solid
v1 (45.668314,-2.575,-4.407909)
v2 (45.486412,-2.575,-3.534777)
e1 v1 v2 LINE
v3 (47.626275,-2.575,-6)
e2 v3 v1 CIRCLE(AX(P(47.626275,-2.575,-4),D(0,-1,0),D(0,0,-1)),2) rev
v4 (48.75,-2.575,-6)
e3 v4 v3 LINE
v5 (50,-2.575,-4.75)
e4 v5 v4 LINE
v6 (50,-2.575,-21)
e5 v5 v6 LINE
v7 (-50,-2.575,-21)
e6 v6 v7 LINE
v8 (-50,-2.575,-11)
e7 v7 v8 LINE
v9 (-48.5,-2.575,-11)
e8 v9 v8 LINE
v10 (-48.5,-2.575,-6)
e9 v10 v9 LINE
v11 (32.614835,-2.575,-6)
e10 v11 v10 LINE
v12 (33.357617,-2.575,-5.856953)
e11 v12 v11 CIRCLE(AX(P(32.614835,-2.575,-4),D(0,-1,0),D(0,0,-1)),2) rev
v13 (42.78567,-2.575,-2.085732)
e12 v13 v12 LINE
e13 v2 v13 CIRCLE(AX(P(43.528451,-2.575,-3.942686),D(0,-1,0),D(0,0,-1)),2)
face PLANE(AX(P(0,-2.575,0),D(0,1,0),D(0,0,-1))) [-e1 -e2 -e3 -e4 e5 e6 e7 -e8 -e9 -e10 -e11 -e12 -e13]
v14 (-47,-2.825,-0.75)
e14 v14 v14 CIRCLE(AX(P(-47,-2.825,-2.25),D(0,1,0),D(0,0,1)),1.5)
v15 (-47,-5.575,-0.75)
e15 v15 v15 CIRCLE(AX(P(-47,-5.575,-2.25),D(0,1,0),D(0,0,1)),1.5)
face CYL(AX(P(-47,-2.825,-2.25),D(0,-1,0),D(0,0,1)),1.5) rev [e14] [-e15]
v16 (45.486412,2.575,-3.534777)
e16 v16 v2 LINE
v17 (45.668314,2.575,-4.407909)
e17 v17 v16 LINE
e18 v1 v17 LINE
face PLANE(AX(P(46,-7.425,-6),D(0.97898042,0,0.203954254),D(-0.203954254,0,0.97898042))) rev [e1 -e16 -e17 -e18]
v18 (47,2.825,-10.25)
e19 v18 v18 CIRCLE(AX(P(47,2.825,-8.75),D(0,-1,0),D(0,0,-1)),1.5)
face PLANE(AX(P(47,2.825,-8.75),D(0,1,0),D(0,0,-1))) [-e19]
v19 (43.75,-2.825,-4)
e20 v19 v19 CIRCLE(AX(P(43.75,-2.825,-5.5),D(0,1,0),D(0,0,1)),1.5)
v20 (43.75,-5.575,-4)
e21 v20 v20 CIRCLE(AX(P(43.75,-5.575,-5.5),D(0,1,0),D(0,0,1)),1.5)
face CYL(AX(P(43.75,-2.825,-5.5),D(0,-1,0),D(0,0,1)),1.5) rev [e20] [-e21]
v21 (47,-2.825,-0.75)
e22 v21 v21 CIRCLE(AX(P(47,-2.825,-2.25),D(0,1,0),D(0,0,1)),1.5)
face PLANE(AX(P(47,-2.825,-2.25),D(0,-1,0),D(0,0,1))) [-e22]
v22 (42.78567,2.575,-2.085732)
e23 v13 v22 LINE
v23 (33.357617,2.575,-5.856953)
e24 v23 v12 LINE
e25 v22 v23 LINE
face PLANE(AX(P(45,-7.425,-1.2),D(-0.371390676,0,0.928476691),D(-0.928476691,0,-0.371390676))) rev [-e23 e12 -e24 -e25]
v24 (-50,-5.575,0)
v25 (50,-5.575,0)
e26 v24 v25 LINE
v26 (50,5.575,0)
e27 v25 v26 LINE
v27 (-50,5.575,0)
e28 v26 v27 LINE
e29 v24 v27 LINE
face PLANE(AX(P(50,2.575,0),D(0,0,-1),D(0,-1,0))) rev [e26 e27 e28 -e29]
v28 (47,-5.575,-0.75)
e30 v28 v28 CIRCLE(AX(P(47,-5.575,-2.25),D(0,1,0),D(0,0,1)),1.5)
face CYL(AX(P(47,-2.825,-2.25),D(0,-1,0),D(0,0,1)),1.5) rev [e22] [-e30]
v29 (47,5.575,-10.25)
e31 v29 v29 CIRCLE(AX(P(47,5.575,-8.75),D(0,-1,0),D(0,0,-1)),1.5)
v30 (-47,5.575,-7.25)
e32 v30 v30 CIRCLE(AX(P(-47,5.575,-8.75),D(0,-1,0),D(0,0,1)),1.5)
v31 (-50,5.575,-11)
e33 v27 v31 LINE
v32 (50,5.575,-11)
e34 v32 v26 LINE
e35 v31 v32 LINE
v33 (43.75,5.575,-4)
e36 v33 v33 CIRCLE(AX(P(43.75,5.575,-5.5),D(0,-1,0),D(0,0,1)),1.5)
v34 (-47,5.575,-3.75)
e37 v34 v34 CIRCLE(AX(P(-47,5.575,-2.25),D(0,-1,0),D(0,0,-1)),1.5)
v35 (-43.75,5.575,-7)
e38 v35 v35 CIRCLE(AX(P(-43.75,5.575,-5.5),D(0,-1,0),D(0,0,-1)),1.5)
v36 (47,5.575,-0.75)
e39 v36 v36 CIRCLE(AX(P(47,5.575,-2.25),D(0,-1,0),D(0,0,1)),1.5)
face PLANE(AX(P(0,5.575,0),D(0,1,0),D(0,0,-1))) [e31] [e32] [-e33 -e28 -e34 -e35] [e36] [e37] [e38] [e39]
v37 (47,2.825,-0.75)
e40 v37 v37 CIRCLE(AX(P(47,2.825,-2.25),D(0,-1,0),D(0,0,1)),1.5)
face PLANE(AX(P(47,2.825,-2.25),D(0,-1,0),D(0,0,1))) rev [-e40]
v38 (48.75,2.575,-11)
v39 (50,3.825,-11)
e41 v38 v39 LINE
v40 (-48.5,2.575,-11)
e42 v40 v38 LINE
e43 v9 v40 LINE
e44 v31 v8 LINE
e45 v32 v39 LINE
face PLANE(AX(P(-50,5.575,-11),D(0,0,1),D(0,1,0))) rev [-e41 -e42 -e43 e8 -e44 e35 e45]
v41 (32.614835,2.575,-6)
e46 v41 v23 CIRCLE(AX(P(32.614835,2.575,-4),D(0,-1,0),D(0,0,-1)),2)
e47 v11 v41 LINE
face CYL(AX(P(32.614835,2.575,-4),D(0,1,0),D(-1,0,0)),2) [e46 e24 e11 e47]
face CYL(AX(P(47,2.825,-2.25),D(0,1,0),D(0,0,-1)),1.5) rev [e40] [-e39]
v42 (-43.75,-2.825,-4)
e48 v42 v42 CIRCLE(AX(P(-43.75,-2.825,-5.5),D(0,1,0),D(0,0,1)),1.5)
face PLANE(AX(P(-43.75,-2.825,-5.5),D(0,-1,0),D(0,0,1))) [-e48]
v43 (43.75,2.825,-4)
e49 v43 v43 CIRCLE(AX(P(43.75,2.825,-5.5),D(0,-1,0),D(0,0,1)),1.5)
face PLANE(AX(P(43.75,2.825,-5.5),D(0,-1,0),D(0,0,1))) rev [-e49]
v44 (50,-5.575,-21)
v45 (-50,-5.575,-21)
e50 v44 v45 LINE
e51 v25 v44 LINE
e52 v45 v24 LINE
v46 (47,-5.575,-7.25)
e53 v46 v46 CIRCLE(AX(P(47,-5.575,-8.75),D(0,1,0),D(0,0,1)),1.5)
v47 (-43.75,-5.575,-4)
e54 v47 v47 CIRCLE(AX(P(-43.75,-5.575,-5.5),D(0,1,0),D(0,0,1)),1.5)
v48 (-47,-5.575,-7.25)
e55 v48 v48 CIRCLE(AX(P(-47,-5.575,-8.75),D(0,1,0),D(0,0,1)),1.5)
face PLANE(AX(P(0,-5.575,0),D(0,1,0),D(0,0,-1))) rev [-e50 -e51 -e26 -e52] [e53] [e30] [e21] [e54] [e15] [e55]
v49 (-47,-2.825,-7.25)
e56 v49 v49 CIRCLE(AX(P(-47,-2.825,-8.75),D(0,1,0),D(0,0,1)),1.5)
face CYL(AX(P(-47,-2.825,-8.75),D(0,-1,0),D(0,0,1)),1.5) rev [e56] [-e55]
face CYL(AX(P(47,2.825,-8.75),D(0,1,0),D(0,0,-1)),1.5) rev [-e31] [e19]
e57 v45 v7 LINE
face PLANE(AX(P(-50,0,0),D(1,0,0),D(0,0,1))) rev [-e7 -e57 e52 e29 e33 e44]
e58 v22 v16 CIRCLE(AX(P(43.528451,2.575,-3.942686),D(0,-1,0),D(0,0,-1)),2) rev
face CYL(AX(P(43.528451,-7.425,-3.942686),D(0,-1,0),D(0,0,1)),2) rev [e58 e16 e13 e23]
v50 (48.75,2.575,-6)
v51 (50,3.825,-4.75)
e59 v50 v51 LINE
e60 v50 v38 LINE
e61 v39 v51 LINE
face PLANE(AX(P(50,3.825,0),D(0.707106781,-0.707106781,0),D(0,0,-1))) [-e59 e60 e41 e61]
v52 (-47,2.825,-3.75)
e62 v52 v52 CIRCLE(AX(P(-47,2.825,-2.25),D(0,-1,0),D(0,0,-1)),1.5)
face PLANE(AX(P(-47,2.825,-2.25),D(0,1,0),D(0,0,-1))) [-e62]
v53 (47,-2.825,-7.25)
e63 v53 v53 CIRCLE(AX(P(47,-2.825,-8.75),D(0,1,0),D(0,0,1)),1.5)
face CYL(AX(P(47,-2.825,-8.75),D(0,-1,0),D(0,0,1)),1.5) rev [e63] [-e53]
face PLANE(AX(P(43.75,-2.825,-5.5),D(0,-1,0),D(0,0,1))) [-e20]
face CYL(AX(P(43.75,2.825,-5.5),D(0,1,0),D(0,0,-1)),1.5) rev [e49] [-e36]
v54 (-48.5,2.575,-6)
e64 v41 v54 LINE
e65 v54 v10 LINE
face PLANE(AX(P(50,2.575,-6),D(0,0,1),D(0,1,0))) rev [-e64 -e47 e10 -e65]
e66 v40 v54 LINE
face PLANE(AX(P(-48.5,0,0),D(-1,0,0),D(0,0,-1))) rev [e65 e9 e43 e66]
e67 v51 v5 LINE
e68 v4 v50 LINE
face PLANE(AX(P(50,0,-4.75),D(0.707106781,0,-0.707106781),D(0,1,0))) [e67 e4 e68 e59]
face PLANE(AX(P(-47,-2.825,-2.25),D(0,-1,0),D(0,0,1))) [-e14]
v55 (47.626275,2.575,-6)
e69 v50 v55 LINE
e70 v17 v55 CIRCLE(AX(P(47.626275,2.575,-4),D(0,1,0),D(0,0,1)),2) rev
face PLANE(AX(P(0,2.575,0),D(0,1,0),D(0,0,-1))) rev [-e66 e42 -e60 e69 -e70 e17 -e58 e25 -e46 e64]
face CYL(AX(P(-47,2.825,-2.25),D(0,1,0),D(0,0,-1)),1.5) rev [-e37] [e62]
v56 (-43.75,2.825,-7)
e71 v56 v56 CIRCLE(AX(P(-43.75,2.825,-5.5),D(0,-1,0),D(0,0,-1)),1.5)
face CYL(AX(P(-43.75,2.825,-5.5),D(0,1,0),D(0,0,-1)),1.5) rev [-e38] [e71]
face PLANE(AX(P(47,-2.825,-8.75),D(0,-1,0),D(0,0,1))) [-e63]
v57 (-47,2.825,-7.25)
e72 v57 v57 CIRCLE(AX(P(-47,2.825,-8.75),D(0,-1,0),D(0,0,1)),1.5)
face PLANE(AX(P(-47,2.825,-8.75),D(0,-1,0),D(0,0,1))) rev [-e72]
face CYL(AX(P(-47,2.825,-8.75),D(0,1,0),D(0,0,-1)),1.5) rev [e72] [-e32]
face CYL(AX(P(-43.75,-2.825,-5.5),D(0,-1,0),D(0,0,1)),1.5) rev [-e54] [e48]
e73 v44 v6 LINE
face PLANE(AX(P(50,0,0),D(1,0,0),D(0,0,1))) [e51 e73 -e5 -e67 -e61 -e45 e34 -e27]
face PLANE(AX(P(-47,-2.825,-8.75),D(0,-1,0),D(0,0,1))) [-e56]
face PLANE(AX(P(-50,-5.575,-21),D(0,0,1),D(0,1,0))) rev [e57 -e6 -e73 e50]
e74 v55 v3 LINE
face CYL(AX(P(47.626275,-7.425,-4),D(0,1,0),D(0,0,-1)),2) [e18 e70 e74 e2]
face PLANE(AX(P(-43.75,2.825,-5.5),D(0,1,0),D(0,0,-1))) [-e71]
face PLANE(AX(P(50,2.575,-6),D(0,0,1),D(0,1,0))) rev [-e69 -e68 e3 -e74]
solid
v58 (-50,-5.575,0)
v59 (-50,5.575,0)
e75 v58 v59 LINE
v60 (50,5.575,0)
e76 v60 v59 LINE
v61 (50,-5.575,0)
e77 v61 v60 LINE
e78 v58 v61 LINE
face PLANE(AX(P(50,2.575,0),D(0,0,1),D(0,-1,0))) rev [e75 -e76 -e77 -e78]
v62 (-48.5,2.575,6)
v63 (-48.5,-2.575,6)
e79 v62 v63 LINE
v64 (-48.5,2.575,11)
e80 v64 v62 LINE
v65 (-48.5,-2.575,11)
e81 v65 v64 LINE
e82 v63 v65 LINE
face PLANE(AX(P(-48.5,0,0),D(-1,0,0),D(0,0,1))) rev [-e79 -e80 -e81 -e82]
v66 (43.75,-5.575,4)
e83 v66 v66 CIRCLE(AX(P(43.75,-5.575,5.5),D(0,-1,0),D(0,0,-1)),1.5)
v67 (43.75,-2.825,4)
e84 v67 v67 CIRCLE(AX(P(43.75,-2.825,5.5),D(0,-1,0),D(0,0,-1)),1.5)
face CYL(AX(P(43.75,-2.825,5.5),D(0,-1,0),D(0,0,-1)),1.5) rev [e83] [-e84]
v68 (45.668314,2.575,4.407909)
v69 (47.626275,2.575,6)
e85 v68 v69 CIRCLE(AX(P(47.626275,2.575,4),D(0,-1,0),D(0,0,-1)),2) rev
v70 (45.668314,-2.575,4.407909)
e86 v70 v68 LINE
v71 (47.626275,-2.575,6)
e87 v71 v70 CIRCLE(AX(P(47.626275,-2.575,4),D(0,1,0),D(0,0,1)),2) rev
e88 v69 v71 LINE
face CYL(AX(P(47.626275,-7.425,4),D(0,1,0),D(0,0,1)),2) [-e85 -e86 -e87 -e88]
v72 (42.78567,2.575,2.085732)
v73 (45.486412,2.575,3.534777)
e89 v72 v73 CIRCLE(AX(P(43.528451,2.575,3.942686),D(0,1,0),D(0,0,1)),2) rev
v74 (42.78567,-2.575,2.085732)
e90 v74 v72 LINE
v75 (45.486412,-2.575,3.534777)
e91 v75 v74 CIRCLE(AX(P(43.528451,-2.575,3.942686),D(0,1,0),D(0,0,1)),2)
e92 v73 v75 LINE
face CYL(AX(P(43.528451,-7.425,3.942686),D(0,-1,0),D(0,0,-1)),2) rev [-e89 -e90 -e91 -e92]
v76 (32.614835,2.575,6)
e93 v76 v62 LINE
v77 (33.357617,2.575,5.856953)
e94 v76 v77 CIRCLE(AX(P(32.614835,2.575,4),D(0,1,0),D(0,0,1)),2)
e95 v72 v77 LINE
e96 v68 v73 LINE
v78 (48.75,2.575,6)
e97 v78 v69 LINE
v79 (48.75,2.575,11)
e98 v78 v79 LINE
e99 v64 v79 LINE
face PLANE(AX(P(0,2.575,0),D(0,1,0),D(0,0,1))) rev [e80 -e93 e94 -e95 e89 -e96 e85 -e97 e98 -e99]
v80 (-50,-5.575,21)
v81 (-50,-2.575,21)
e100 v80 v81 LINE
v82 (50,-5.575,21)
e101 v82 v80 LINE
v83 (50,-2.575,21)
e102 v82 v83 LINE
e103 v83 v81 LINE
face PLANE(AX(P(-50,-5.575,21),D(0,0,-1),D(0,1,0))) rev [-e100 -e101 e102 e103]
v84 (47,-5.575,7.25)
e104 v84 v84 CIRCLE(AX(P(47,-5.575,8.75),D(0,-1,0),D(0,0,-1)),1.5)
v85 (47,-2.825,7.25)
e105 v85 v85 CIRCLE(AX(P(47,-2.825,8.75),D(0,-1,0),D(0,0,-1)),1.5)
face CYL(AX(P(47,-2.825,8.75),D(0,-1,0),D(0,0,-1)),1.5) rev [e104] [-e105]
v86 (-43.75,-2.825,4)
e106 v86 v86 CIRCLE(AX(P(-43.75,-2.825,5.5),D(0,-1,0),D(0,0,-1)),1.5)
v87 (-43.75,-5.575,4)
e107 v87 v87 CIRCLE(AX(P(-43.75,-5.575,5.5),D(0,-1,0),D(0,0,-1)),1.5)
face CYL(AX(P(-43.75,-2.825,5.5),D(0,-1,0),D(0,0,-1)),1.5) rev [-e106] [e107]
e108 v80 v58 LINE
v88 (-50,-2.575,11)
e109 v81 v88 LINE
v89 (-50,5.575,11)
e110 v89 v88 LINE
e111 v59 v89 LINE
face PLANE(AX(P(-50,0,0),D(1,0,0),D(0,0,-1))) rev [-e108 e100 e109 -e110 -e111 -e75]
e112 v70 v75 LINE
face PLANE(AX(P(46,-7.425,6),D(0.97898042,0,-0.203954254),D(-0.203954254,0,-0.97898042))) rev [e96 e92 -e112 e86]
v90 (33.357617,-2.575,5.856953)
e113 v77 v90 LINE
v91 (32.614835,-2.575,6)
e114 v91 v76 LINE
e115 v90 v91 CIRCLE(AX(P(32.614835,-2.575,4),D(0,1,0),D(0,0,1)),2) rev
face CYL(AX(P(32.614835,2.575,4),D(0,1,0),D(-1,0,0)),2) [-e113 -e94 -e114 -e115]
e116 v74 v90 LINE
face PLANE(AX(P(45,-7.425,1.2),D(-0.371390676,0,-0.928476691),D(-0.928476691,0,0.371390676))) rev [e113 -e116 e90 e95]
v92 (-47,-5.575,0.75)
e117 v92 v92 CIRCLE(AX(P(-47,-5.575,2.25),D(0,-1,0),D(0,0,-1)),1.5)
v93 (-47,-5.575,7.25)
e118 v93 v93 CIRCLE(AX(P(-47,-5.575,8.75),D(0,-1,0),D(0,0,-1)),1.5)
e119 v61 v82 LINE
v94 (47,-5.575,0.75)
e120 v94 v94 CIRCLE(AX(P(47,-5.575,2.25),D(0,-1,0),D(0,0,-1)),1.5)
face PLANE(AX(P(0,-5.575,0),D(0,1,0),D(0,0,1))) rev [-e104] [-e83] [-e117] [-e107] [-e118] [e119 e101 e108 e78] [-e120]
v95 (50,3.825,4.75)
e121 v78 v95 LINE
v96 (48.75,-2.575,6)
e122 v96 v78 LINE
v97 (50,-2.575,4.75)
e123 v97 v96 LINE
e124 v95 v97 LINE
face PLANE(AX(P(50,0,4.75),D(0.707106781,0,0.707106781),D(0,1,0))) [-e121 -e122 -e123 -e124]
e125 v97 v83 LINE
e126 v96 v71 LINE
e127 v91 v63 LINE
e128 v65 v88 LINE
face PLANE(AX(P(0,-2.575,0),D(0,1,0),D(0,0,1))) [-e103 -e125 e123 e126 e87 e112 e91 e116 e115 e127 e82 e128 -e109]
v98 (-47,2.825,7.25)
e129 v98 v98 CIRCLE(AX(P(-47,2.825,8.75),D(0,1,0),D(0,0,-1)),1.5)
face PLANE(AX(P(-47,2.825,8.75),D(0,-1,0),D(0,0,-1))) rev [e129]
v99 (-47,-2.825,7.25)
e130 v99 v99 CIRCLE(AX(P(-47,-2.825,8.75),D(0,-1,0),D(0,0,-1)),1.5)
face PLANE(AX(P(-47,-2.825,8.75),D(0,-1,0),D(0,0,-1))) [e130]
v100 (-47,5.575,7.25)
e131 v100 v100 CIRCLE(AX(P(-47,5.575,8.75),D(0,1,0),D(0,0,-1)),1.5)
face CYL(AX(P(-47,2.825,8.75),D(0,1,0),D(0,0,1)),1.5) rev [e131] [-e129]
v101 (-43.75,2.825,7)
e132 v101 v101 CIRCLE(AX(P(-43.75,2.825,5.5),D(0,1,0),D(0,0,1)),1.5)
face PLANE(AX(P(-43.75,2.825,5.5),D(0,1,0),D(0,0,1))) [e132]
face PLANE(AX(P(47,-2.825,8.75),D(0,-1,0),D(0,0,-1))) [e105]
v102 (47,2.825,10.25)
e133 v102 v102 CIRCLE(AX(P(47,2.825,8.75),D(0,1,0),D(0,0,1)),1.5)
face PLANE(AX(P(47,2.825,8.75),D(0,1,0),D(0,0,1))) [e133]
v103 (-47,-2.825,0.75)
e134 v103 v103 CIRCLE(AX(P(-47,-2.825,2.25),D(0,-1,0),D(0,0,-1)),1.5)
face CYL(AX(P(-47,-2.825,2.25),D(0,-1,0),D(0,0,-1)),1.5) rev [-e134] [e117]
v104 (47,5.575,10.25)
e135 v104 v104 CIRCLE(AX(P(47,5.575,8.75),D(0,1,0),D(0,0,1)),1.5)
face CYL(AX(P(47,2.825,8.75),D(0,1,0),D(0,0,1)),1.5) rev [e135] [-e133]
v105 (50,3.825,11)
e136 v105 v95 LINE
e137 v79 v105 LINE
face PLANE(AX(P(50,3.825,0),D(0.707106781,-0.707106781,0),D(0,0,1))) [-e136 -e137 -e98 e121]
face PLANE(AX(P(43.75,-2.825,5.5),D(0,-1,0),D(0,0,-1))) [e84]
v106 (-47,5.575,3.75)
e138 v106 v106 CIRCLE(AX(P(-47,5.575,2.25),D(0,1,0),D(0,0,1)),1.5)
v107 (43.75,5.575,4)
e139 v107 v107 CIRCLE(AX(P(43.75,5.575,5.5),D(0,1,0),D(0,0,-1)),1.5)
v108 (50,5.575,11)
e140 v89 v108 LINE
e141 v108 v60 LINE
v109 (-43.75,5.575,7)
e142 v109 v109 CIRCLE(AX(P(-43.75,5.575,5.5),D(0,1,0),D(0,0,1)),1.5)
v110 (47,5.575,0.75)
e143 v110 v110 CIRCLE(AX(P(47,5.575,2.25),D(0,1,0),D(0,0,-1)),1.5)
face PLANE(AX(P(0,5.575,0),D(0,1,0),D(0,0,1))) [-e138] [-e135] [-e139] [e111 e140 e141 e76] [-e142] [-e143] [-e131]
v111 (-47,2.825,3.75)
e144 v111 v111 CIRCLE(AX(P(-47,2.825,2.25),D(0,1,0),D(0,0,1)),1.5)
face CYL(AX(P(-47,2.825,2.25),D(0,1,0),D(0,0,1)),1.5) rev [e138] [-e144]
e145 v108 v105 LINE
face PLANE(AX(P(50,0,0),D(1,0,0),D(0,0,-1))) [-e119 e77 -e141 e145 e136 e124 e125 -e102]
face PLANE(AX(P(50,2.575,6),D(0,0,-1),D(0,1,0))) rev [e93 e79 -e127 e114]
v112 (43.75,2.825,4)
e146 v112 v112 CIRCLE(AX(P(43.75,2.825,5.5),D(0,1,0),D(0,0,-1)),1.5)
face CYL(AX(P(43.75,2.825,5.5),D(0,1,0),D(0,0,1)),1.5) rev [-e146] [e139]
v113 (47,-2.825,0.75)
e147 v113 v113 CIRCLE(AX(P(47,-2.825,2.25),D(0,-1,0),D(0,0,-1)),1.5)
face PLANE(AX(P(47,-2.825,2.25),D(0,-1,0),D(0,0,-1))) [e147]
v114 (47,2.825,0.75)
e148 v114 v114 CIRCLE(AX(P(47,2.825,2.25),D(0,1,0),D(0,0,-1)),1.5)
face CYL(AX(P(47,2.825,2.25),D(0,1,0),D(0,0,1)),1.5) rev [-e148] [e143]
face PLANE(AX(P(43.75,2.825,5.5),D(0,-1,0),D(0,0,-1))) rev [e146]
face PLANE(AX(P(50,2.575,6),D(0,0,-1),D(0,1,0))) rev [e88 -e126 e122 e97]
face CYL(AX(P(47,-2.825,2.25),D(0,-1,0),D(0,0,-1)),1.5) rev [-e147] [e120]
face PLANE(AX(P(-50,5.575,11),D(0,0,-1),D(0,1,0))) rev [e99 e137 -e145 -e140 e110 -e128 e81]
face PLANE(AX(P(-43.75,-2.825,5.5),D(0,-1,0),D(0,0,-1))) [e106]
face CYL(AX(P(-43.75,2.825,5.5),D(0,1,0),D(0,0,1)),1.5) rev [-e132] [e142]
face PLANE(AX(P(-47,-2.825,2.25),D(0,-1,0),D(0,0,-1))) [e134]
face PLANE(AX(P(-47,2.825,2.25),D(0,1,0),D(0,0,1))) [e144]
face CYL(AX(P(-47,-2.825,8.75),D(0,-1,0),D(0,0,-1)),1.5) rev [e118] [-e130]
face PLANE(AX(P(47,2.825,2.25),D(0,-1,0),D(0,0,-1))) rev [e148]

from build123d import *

# Parameters (mm, degrees)
ESBO_O1_W                = 6
ESBO_O1_H                = 5.15
RESSALTO_EXTRUS_O1_DEPTH = 50
CORTE_EXTRUS_O5_START    = -2.575
CORTE_EXTRUS_O5_DEPTH    = 5.15
FILETE2_R                = 2
SKETCH1_W                = 100
SKETCH1_H                = 11
BOSS_EXTRUDE1_DEPTH      = 3
SKETCH2_W                = 100
SKETCH2_H                = 21
BOSS_EXTRUDE2_DEPTH      = 3
FILLET1_R                = 2
FILLET2_R                = 2
CUT_EXTRUDE1_START       = 2.825
CUT_EXTRUDE1_OUTLINE_R   = 1.5
CUT_EXTRUDE1_DEPTH       = 2.75
SKETCH6_W                = 5
SKETCH6_H                = 5.15
BOSS_EXTRUDE4_DEPTH      = 1.5
SKETCH8_R                = 1.5
CUT_EXTRUDE2_DEPTH       = 2.75
CHAMFER2_SIZE            = 1.25


# Read off the part's stored shape, not the designer's step: Corte-extrusão5, Cut-Extrude1
with BuildPart() as part:
    # Esboço1 → Ressalto-extrusão1 (new, symmetric)
    with BuildSketch(Plane(origin=(0, 0, 0), x_dir=(0, 0, -1), z_dir=(1, 0, 0))):
        with Locations((-3, 0)):
            Rectangle(ESBO_O1_W, ESBO_O1_H)
    extrude(amount=RESSALTO_EXTRUS_O1_DEPTH, both=True)

    # Corte-extrusão5 outline → Corte-extrusão5 (cut)
    with BuildSketch(Plane(origin=(0, 0, 0), x_dir=(1, 0, 0), z_dir=(0, 1, 0)).offset(CORTE_EXTRUS_O5_START)):
        Polygon((46, -6), (45, -1.2), (33, -6), align=None)
    extrude(amount=CORTE_EXTRUS_O5_DEPTH, mode=Mode.SUBTRACT)

    # Filete2
    filete2_edges = [part.edges().sort_by_distance(p)[0] for p in [
        (46, 0, 6),
    ]]
    fillet(filete2_edges, radius=FILETE2_R)

    # Sketch1 → Boss-Extrude1 (add)
    with BuildSketch(Plane(origin=(0, 2.575, 0), x_dir=(1, 0, 0), z_dir=(0, 1, 0))):
        with Locations((0, -5.5)):
            Rectangle(SKETCH1_W, SKETCH1_H)
    extrude(amount=BOSS_EXTRUDE1_DEPTH)

    # Sketch2 → Boss-Extrude2 (add)
    with BuildSketch(Plane.XZ.offset(2.575)):
        with Locations((0, 10.5)):
            Rectangle(SKETCH2_W, SKETCH2_H)
    extrude(amount=BOSS_EXTRUDE2_DEPTH)

    # Fillet1
    fillet1_edges = [part.edges().sort_by_distance(p)[0] for p in [
        (45, 0, 1.2),
    ]]
    fillet(fillet1_edges, radius=FILLET1_R)

    # Fillet2
    fillet2_edges = [part.edges().sort_by_distance(p)[0] for p in [
        (33, 0, 6),
    ]]
    fillet(fillet2_edges, radius=FILLET2_R)

    # Cut-Extrude1 outline → Cut-Extrude1 (cut)
    with BuildSketch(Plane(origin=(0, 0, 0), x_dir=(1, 0, 0), z_dir=(0, 1, 0)).offset(CUT_EXTRUDE1_START)):
        with Locations((-43.75, -5.5)):
            Circle(CUT_EXTRUDE1_OUTLINE_R)
        with Locations((43.75, -5.5)):
            Circle(CUT_EXTRUDE1_OUTLINE_R)
        with Locations((47, -2.25)):
            Circle(CUT_EXTRUDE1_OUTLINE_R)
        with Locations((47, -8.75)):
            Circle(CUT_EXTRUDE1_OUTLINE_R)
        with Locations((-47, -8.75)):
            Circle(CUT_EXTRUDE1_OUTLINE_R)
        with Locations((-47, -2.25)):
            Circle(CUT_EXTRUDE1_OUTLINE_R)
    extrude(amount=CUT_EXTRUDE1_DEPTH, mode=Mode.SUBTRACT)

    # Sketch6 → Boss-Extrude4 (add)
    with BuildSketch(Plane.ZY.offset(50)):
        with Locations((8.5, 0)):
            Rectangle(SKETCH6_W, SKETCH6_H)
    extrude(amount=-BOSS_EXTRUDE4_DEPTH)

    # Sketch8 → Cut-Extrude2 (cut)
    with BuildSketch(Plane.XZ.offset(5.575)):
        with Locations(Location((47, 8.75, 0), (0, 0, 90))):
            Circle(SKETCH8_R)
        with Locations(Location((43.75, 5.5, 0), (0, 0, 270))):
            Circle(SKETCH8_R)
        with Locations(Location((47, 2.25, 0), (0, 0, 270))):
            Circle(SKETCH8_R)
        with Locations(Location((-47, 8.75, 0), (0, 0, 270))):
            Circle(SKETCH8_R)
        with Locations(Location((-43.75, 5.5, 0), (0, 0, 90))):
            Circle(SKETCH8_R)
        with Locations(Location((-47, 2.25, 0), (0, 0, 90))):
            Circle(SKETCH8_R)
    extrude(amount=-CUT_EXTRUDE2_DEPTH, mode=Mode.SUBTRACT)

    # Chamfer2
    chamfer2_edges = [part.edges().sort_by_distance(p)[0] for p in [
        (50, 2.575, 8.5),
        (50, 0, 6),
    ]]
    chamfer(chamfer2_edges, length=CHAMFER2_SIZE)


with BuildPart() as body_2:
    # Mirror4: mirrored copy
    add(part.part.mirror(Plane(origin=(50, 2.575, 0), x_dir=(1, 0, 0), z_dir=(0, 0, 1))))


solid = Compound([part.part, body_2.part])
